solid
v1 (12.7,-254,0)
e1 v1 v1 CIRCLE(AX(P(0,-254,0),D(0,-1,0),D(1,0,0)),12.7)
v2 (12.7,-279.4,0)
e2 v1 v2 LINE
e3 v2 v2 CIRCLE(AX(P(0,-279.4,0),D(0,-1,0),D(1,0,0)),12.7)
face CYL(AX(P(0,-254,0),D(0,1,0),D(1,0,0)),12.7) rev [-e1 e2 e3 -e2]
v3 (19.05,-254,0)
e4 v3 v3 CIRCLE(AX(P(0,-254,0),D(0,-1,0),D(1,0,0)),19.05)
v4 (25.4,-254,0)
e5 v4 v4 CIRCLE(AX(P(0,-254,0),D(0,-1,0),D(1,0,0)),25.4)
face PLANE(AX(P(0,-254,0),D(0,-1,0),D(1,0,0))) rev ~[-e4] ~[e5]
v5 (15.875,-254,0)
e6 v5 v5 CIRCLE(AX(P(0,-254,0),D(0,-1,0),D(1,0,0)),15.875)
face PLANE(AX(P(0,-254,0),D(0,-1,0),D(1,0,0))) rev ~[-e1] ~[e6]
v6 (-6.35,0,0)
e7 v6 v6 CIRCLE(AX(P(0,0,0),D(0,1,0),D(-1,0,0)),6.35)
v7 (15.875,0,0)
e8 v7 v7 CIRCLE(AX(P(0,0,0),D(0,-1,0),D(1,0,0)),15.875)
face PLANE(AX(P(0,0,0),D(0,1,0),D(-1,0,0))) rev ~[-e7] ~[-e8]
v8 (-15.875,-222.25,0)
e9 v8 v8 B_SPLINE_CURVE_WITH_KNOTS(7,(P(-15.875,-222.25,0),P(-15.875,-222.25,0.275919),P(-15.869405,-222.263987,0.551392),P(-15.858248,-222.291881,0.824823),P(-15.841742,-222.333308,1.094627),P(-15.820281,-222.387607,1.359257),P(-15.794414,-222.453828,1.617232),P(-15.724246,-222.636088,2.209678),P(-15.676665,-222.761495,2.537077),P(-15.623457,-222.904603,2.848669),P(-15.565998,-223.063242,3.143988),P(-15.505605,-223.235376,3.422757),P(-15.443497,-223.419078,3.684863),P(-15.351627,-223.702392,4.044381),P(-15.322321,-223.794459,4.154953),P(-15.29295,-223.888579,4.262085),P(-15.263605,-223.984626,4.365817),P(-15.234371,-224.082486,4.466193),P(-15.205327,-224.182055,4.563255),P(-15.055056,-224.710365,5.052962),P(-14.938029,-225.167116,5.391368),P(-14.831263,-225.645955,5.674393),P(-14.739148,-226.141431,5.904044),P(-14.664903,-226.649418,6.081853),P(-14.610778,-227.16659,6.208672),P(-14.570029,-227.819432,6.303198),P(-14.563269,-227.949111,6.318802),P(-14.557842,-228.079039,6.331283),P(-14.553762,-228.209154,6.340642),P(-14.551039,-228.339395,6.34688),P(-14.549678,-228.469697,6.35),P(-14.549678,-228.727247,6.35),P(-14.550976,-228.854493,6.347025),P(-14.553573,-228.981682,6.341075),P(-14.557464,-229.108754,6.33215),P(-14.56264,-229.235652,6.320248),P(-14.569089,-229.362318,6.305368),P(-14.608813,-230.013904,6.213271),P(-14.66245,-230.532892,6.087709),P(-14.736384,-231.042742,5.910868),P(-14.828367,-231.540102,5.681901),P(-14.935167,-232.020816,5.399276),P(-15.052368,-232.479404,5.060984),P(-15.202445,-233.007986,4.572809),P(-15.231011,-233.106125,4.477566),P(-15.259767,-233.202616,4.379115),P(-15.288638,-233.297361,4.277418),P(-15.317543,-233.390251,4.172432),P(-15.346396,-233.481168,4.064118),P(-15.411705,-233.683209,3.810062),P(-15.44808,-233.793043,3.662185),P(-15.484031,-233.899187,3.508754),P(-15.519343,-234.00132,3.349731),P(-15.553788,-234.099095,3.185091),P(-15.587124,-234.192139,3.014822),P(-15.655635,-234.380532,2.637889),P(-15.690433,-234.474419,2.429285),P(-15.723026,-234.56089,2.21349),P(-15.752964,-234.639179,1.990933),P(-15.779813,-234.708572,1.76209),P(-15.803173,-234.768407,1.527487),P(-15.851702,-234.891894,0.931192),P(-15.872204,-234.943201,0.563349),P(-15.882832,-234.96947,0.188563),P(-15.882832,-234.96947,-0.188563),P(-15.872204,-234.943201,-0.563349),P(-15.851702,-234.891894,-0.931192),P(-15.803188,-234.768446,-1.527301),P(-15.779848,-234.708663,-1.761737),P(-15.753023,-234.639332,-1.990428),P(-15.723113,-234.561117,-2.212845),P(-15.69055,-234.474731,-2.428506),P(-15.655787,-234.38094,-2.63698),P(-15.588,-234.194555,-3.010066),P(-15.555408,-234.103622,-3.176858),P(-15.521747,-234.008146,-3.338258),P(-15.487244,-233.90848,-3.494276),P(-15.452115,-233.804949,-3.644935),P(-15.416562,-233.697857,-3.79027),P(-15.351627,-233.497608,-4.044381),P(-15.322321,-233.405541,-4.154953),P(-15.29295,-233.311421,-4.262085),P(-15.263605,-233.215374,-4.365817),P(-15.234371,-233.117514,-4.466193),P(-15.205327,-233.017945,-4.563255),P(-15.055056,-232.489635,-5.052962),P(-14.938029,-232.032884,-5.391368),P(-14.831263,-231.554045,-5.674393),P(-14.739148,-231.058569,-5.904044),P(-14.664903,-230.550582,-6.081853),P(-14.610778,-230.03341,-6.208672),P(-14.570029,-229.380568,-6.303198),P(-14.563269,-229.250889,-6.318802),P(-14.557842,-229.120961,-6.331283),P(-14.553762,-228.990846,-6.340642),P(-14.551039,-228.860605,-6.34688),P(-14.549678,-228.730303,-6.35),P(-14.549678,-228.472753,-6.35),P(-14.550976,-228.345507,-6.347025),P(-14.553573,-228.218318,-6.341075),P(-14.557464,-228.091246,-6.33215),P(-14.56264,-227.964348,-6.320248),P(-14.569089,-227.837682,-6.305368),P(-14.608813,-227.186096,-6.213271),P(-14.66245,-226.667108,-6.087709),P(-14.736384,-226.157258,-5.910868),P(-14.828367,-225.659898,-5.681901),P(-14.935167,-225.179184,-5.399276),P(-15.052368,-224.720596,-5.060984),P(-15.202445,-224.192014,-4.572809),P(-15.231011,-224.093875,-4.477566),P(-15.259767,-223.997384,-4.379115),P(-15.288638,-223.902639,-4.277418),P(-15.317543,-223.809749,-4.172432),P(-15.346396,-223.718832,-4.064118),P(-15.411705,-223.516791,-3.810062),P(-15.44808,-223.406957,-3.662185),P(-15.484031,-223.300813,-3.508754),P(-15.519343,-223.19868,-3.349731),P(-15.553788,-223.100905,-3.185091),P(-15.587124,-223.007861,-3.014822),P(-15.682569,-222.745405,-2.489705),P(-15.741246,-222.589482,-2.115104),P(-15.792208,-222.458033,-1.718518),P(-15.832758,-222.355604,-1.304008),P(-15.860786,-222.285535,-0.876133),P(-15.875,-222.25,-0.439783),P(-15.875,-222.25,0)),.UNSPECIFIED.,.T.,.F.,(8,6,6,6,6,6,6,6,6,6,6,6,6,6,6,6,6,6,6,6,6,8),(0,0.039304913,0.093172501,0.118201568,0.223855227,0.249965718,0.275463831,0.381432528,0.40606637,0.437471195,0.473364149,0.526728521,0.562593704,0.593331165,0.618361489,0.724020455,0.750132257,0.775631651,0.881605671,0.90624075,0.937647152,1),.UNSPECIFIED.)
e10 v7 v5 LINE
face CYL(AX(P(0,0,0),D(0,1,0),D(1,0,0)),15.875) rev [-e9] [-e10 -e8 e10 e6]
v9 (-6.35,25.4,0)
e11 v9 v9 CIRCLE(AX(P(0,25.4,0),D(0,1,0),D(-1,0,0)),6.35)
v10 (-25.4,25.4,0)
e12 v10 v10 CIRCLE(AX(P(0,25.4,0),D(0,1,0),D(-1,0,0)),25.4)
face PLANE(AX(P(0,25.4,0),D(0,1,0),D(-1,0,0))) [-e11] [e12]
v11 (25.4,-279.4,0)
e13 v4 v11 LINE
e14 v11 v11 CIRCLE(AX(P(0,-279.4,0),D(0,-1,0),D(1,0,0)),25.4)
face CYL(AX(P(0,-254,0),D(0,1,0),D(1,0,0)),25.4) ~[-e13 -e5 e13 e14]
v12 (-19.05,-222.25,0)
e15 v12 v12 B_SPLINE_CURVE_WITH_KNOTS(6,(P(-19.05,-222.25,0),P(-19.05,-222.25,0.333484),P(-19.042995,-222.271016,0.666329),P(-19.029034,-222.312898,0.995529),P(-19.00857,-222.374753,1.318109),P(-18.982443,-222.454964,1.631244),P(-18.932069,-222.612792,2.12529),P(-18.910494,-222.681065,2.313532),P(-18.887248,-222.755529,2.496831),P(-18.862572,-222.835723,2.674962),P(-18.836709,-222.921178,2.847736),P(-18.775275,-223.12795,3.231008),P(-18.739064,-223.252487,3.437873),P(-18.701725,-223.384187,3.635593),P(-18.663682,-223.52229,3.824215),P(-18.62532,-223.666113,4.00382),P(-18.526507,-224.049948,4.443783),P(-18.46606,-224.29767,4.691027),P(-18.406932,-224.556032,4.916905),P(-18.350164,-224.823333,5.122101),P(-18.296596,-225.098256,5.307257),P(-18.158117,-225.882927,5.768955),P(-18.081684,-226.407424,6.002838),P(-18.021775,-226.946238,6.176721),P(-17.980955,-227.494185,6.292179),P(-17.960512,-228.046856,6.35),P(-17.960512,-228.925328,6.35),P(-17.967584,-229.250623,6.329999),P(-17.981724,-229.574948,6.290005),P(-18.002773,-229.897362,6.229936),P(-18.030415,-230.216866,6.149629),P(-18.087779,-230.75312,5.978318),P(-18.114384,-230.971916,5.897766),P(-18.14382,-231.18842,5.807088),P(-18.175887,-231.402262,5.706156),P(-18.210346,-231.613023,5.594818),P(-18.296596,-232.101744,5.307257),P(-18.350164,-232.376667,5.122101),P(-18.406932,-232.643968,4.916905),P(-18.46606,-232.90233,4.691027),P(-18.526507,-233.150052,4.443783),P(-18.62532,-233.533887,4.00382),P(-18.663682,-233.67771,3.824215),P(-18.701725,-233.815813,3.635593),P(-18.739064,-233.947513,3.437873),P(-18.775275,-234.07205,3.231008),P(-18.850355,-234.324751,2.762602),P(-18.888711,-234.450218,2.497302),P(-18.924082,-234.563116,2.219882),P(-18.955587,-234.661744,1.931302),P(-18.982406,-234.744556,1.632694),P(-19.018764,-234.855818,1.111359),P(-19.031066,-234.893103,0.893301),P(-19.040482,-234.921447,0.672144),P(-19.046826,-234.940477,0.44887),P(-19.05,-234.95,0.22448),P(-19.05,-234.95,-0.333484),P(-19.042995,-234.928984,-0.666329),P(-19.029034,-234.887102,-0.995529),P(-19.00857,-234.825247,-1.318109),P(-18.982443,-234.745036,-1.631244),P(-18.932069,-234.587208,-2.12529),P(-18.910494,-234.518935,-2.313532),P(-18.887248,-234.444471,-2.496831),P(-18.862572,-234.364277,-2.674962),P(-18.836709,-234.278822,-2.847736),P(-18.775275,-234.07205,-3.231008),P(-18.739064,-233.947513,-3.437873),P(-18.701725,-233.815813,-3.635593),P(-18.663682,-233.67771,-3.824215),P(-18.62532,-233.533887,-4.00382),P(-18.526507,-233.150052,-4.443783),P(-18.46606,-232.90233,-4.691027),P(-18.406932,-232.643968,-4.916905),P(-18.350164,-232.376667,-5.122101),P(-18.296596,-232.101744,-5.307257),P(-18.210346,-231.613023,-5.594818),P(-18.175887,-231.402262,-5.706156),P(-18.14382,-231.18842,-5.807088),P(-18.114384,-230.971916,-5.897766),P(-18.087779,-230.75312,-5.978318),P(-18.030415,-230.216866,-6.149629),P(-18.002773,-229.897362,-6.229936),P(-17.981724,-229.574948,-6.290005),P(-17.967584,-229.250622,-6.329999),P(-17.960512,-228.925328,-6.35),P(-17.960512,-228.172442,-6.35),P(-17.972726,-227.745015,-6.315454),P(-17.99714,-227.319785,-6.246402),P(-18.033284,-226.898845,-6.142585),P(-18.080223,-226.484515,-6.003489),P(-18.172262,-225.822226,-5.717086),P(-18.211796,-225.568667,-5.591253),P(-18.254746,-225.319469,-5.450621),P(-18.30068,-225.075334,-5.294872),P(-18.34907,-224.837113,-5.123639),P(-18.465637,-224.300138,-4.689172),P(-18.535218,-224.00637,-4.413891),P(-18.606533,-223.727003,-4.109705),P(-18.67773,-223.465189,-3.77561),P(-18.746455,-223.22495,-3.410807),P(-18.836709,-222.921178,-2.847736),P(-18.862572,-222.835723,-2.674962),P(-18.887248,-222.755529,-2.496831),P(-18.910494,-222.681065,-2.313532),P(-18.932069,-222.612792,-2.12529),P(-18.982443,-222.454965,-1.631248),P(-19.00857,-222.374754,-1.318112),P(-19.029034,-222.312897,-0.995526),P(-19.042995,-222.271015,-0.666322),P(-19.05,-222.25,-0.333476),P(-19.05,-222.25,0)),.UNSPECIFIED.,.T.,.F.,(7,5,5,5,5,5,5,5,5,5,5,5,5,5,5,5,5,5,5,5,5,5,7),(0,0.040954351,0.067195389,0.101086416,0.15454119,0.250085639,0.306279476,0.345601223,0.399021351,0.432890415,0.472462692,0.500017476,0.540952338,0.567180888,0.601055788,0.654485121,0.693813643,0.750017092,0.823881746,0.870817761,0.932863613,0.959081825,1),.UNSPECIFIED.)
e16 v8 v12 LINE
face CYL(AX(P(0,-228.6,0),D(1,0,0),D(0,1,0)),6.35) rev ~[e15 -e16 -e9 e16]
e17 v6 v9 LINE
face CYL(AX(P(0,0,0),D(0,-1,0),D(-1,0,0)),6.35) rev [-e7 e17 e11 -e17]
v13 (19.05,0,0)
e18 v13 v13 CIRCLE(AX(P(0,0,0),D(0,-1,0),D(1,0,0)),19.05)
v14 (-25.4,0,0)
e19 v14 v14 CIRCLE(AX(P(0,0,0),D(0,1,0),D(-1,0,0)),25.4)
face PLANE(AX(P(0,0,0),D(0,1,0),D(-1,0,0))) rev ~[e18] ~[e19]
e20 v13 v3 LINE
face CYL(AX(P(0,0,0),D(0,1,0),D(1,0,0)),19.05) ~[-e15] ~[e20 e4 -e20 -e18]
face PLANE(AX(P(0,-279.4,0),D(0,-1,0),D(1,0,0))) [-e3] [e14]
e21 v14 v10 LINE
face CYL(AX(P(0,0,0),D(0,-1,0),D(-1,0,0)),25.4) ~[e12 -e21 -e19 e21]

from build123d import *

# Parameters (mm, degrees)
F0_R     = 19.05
F0_R_2   = 15.875
F1_DEPTH = 254
F2_R     = 25.4
F2_R_2   = 6.35
F3_DEPTH = 25.4
F4_R     = 25.4
F4_R_2   = 12.7
F5_DEPTH = 25.4
F7_D     = 12.7
F7_DEPTH = 25.401


with BuildPart() as f1:
    # F0 (on Front) → F1 (new body)
    with BuildSketch(Plane.XZ):
        Circle(F0_R)
        Circle(F0_R_2, mode=Mode.SUBTRACT)
    extrude(amount=F1_DEPTH)

    # F2 (on face) → F3 (join)
    with BuildSketch(Plane(origin=(0, 0, 0), x_dir=(-1, 0, 0), z_dir=(0, 1, 0))):
        Circle(F2_R)
        Circle(F2_R_2, mode=Mode.SUBTRACT)
    extrude(amount=F3_DEPTH)

    # F4 (on face) → F5 (join)
    with BuildSketch(Plane.XZ.offset(254)):
        Circle(F4_R)
        Circle(F4_R_2, mode=Mode.SUBTRACT)
    extrude(amount=F5_DEPTH)

    # F7 (through all, one way)
    with BuildSketch(Plane.YZ):
        with Locations((-228.6, 0)):
            Circle(F7_D / 2)
    extrude(amount=-F7_DEPTH, mode=Mode.SUBTRACT)


solid = f1.part
